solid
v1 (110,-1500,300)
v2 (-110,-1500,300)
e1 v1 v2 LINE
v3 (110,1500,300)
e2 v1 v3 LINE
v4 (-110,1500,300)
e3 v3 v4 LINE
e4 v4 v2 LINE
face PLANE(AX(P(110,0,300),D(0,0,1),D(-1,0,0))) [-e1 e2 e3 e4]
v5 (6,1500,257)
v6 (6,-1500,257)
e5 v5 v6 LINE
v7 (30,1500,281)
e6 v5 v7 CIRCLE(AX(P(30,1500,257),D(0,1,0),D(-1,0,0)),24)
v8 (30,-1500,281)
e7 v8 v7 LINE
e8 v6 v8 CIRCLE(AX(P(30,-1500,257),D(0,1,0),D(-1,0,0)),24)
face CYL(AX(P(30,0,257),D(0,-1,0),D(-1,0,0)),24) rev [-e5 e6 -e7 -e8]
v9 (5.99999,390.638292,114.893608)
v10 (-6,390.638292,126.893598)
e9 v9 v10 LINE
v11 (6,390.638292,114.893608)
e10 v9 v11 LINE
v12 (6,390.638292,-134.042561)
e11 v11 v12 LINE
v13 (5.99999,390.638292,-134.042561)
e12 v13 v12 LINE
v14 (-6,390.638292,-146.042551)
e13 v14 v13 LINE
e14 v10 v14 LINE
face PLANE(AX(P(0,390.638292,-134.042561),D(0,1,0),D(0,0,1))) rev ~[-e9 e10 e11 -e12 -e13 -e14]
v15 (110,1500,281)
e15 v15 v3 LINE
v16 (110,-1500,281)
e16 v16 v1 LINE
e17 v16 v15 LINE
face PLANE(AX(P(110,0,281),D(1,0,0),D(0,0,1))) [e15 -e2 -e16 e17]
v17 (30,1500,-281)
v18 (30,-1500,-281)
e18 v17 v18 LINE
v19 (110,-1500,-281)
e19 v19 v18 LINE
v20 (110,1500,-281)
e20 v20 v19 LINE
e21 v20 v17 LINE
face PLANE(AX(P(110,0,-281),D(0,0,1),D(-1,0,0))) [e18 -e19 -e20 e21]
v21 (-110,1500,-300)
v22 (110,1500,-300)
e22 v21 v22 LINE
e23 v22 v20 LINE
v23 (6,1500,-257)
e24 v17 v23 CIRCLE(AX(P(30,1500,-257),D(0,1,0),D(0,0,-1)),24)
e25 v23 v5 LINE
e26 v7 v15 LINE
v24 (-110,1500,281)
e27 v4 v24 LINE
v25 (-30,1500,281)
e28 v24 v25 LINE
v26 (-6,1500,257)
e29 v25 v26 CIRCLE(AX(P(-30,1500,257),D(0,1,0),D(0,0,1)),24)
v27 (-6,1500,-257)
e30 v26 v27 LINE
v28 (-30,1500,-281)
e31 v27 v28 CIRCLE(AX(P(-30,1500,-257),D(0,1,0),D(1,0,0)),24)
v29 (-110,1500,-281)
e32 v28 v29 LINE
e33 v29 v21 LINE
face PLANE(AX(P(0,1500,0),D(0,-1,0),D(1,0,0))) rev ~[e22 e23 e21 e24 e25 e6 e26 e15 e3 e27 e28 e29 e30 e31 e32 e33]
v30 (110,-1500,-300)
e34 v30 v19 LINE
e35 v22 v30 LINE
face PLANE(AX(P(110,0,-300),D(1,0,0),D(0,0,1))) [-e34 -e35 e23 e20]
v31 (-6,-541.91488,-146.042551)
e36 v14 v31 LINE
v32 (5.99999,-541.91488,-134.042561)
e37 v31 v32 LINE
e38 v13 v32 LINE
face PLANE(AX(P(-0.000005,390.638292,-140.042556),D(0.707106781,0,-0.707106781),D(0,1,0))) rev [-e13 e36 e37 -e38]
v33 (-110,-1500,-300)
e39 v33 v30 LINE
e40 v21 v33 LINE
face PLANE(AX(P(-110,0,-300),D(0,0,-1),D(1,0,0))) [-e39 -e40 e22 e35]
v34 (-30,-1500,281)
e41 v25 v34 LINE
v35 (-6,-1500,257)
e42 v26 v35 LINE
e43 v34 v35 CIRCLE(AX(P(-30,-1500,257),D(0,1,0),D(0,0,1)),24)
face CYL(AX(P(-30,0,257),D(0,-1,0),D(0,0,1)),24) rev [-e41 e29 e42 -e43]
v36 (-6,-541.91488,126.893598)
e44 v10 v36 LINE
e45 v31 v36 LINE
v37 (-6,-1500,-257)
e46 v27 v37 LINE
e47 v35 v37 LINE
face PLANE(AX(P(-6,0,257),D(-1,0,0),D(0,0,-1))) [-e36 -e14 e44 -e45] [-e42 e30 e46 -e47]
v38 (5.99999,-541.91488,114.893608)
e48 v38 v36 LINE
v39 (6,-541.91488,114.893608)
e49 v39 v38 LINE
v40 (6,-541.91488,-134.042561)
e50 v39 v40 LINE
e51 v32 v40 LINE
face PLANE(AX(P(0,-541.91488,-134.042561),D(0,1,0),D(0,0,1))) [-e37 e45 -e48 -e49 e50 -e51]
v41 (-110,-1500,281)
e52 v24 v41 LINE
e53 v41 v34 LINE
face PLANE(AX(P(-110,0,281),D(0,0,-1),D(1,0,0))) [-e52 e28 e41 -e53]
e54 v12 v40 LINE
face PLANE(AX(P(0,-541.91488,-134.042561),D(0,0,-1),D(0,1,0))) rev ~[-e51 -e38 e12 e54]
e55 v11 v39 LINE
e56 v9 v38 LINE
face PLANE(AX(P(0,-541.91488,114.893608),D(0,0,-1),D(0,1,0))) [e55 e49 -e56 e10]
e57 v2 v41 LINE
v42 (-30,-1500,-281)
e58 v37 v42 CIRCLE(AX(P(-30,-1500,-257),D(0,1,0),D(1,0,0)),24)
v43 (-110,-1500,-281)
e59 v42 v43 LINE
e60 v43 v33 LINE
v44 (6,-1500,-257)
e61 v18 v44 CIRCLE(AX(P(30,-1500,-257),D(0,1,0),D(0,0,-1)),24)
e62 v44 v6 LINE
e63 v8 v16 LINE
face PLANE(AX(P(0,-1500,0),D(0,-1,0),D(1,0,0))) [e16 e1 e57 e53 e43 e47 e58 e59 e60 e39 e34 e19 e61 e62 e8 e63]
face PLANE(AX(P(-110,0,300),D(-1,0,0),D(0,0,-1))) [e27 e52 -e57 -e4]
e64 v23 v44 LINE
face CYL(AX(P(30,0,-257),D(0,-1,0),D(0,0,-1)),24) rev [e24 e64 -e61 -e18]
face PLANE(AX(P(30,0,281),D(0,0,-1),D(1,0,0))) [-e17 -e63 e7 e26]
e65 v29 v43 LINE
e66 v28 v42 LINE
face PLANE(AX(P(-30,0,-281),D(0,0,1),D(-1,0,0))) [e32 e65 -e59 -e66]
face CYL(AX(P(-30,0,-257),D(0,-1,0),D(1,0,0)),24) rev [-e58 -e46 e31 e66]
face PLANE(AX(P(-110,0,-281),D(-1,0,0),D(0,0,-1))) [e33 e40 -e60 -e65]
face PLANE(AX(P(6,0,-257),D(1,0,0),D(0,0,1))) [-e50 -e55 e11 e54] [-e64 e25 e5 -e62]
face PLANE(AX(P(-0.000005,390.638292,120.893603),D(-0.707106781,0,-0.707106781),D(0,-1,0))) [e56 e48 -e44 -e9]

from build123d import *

# Parameters (mm, degrees)
F1_DEPTH      = 1500
F4_W          = 932.5531721115
F4_H          = 248.9361688495
F5_DEPTH      = 110.001
F5_DEPTH_BACK = 110.001
F6_SIZE       = 11.99999


# Not quite as in the source:
# - a fillet or chamfer is up to 0.001 mm smaller than in the source, because OpenCascade refuses the exact size
# - a feature of the source that left no trace in its solid (it failed there, or was rolled back) is left out


with BuildPart() as f1:
    # F0 (on Front) → F1 (new body, symmetric)
    with BuildSketch(Plane.XZ):
        with BuildLine():
            Line((110, 300), (-110, 300))
            Line((-110, 300), (-110, 281))
            Line((-110, 281), (-30, 281))
            ThreePointArc((-30, 281), (-13.0294372515, 273.9705627485), (-6, 257))
            Line((-6, 257), (-6, 0))
            Line((-6, 0), (-6, -257))
            ThreePointArc((-6, -257), (-13.0294372515, -273.9705627485), (-30, -281))
            Line((-30, -281), (-110, -281))
            Line((-110, -281), (-110, -300))
            Line((-110, -300), (110, -300))
            Line((110, -300), (110, -281))
            Line((110, -281), (30, -281))
            ThreePointArc((30, -281), (13.0294372515, -273.9705627485), (6, -257))
            Line((6, -257), (6, 0))
            Line((6, 0), (6, 257))
            ThreePointArc((6, 257), (13.0294372515, 273.9705627485), (30, 281))
            Line((30, 281), (110, 281))
            Line((110, 281), (110, 300))
        make_face()
    extrude(amount=F1_DEPTH, both=True)

    # F4 (on Right) → F5 (cut, two sides)
    with BuildSketch(Plane.YZ) as f5_sk:
        with Locations((-75.63829422, -9.5744766295)):
            Rectangle(F4_W, F4_H)
    extrude(amount=-F5_DEPTH, mode=Mode.SUBTRACT)
    extrude(f5_sk.sketch, amount=F5_DEPTH_BACK, mode=Mode.SUBTRACT)

    # F6 (size 12 in the source; OpenCascade refuses exactly that, so slightly less here)
    f6_edges = [f1.edges().sort_by_distance(p)[0] for p in [
        (-6, -75.638294, 114.893608),
        (-6, -75.638294, -134.042561),
    ]]
    chamfer(f6_edges, length=F6_SIZE)


solid = f1.part
